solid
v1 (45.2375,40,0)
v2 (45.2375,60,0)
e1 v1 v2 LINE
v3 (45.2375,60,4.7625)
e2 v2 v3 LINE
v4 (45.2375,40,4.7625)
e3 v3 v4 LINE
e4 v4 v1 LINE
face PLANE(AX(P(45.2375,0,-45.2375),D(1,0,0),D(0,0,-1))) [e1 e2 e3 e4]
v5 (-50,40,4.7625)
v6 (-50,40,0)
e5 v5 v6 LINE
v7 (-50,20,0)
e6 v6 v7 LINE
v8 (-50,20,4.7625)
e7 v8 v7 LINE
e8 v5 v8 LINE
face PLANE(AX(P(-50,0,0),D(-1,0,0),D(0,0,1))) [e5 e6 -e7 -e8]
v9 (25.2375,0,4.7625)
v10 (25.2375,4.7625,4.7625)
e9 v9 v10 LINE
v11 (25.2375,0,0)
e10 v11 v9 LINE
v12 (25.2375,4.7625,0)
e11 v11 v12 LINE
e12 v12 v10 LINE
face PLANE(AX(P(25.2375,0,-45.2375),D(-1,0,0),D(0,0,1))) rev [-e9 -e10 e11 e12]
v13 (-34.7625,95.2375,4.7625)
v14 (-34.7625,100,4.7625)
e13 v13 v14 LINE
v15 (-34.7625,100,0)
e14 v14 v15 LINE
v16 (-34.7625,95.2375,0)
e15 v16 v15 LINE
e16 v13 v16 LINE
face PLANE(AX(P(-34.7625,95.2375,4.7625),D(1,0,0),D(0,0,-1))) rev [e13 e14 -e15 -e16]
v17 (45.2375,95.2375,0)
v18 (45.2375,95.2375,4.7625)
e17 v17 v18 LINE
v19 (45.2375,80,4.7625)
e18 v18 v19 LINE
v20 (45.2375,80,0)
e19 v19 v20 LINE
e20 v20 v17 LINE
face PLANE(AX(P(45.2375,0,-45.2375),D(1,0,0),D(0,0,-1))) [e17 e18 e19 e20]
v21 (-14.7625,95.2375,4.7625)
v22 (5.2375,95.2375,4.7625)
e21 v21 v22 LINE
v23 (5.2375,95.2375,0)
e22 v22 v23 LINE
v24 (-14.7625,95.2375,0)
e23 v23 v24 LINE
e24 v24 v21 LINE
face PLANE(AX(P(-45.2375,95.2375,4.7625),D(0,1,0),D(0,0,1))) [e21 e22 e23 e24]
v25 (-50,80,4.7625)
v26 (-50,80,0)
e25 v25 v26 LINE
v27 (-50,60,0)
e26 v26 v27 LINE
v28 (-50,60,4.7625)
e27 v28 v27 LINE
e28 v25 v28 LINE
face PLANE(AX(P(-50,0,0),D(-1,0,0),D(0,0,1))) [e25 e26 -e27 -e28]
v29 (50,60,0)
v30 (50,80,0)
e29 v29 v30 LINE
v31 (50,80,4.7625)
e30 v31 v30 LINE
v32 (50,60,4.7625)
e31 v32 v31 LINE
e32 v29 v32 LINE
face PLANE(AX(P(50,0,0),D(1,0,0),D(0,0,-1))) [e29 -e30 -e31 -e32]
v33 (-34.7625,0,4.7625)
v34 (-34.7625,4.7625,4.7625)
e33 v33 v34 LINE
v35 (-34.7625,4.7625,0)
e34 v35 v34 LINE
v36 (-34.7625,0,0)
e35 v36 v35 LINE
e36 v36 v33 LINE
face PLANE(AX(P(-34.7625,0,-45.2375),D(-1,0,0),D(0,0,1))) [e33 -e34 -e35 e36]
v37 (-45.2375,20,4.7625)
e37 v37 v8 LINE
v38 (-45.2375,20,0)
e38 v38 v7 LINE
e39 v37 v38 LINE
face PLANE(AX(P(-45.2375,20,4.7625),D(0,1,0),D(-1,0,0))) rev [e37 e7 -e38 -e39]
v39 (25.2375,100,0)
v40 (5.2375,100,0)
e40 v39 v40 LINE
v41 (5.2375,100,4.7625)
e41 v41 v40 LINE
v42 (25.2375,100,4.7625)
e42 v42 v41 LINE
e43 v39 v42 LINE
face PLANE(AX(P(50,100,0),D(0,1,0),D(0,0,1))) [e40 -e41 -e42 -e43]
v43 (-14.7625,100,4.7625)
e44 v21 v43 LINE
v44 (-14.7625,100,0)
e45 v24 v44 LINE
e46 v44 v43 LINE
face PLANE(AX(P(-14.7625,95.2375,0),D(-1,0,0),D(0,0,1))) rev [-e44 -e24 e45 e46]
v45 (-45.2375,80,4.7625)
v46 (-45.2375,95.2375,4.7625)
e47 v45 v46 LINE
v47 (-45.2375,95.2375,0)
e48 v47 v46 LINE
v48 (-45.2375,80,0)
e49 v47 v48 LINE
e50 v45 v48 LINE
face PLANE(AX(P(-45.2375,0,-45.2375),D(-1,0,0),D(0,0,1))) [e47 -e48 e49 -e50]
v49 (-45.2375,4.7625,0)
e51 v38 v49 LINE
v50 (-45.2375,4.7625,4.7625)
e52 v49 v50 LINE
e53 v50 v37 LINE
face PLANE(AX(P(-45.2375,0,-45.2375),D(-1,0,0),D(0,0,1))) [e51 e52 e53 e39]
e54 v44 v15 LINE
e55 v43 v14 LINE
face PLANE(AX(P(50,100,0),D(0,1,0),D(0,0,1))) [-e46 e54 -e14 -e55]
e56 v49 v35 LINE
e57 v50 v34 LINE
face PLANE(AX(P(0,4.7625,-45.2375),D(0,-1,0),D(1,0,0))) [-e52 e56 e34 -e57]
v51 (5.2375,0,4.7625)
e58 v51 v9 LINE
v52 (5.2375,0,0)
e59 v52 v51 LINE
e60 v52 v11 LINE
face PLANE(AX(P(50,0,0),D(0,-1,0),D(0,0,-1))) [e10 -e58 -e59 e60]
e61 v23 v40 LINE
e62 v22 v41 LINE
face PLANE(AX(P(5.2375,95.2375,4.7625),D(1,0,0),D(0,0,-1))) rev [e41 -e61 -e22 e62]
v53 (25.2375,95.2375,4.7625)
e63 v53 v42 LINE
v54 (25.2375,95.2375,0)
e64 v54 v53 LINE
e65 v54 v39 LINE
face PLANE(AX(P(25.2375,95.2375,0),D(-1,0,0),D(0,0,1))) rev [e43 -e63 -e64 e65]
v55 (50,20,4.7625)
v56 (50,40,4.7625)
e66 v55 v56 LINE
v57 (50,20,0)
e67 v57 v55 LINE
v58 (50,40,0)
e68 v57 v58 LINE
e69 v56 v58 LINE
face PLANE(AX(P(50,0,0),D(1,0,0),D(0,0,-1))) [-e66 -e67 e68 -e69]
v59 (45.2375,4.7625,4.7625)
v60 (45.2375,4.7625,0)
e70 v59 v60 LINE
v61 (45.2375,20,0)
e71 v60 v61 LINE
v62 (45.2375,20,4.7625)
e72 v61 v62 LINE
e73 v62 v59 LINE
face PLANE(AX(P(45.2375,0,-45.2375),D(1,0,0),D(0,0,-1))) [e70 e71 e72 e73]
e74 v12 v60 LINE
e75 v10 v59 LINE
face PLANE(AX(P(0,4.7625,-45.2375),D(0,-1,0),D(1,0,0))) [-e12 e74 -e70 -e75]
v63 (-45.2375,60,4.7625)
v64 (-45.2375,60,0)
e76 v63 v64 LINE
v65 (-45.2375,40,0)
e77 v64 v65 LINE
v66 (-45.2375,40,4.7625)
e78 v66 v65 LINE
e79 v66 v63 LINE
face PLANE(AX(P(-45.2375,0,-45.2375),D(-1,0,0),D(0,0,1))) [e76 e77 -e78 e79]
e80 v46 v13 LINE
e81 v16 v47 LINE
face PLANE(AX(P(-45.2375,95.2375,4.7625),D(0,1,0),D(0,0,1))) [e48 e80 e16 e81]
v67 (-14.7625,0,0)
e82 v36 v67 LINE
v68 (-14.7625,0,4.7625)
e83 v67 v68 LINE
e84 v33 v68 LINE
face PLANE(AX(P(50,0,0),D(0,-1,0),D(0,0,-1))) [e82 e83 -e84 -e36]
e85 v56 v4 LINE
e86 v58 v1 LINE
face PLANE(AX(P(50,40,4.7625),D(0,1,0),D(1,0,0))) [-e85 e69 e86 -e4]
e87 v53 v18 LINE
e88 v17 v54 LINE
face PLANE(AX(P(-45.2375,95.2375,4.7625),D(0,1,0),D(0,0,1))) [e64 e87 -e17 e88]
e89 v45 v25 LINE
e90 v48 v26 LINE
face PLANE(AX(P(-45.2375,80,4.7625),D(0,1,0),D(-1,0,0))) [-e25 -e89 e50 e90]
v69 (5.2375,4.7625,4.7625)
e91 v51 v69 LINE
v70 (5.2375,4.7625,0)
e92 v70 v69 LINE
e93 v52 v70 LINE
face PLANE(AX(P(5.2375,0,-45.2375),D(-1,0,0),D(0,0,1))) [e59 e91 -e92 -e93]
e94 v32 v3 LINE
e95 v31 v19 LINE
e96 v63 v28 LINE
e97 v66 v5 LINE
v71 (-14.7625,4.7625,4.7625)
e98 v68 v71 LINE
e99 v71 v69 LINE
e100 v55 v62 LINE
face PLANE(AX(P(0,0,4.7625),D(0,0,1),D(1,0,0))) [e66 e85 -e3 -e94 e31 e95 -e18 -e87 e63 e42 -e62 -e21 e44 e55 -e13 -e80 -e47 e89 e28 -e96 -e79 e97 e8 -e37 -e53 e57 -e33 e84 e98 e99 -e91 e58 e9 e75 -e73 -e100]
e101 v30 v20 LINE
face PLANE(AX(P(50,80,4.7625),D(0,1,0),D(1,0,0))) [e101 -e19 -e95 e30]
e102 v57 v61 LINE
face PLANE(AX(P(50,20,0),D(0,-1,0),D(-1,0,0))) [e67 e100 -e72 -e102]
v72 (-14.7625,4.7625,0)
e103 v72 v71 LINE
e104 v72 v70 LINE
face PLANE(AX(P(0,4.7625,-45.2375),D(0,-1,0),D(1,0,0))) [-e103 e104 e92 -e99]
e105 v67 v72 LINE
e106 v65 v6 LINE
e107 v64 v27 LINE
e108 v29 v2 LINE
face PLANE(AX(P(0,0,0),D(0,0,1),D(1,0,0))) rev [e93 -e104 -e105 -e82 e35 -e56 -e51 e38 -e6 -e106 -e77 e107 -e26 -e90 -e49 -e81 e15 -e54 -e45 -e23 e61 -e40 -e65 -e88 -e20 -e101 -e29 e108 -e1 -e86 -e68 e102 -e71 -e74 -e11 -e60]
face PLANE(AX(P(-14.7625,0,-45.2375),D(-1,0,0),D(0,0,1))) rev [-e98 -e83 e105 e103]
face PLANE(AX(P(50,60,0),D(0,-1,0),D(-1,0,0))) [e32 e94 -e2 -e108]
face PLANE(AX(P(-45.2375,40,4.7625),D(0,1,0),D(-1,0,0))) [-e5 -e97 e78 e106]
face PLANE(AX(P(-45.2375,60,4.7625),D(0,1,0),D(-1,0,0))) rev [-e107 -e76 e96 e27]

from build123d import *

# Parameters (mm, degrees)
SKETCH2_W           = 100
SKETCH2_H           = 100
BOSS_EXTRUDE1_DEPTH = 4.7625
CAVITY1_START       = -50
CAVITY1_OUTLINE_W   = 20
CAVITY1_OUTLINE_H   = 4.7625
CAVITY1_DEPTH       = 4.7625
CAVITY1_START_2     = 45.2375
CAVITY1_2_OUTLINE_W = 20
CAVITY1_2_OUTLINE_H = 4.7625
CAVITY1_2_DEPTH     = 4.7625
CAVITY1_START_3     = -14.7625
CAVITY1_3_OUTLINE_W = 4.7625
CAVITY1_3_OUTLINE_H = 4.7625
CAVITY1_3_DEPTH     = 20
CAVITY1_START_4     = 25.2375
CAVITY1_4_OUTLINE_W = 4.7625
CAVITY1_4_OUTLINE_H = 4.7625
CAVITY1_4_DEPTH     = 20
CAVITY1_START_5     = -45.2375
CAVITY1_5_OUTLINE_W = 4.7625
CAVITY1_5_OUTLINE_H = 4.7625
CAVITY1_5_DEPTH     = 10.475


# Read off the part's stored shape, not the designer's step: Cavity1
with BuildPart() as part:
    # Sketch2 → Boss-Extrude1 (new body)
    with BuildSketch(Plane.XY.offset(4.7625)):
        with Locations((0, 50)):
            Rectangle(SKETCH2_W, SKETCH2_H)
    extrude(amount=-BOSS_EXTRUDE1_DEPTH)

    # Cavity1 outline → Cavity1 (cut)
    with BuildSketch(Plane.YZ.offset(CAVITY1_START)):
        with Locations((10, 2.38125)):
            Rectangle(CAVITY1_OUTLINE_W, CAVITY1_OUTLINE_H)
        with Locations((50, 2.38125)):
            Rectangle(CAVITY1_OUTLINE_W, CAVITY1_OUTLINE_H)
        with Locations((90, 2.38125)):
            Rectangle(CAVITY1_OUTLINE_W, CAVITY1_OUTLINE_H)
    extrude(amount=CAVITY1_DEPTH, mode=Mode.SUBTRACT)

    # Cavity1 2 outline → Cavity1 2 (cut)
    with BuildSketch(Plane.YZ.offset(CAVITY1_START_2)):
        with Locations((10, 2.38125)):
            Rectangle(CAVITY1_2_OUTLINE_W, CAVITY1_2_OUTLINE_H)
        with Locations((50, 2.38125)):
            Rectangle(CAVITY1_2_OUTLINE_W, CAVITY1_2_OUTLINE_H)
        with Locations((90, 2.38125)):
            Rectangle(CAVITY1_2_OUTLINE_W, CAVITY1_2_OUTLINE_H)
    extrude(amount=CAVITY1_2_DEPTH, mode=Mode.SUBTRACT)

    # Cavity1 3 outline → Cavity1 3 (cut)
    with BuildSketch(Plane.YZ.offset(CAVITY1_START_3)):
        with Locations((2.38125, 2.38125)):
            Rectangle(CAVITY1_3_OUTLINE_W, CAVITY1_3_OUTLINE_H)
        with Locations((97.61875, 2.38125)):
            Rectangle(CAVITY1_3_OUTLINE_W, CAVITY1_3_OUTLINE_H)
    extrude(amount=CAVITY1_3_DEPTH, mode=Mode.SUBTRACT)

    # Cavity1 4 outline → Cavity1 4 (cut)
    with BuildSketch(Plane.YZ.offset(CAVITY1_START_4)):
        with Locations((2.38125, 2.38125)):
            Rectangle(CAVITY1_4_OUTLINE_W, CAVITY1_4_OUTLINE_H)
        with Locations((97.61875, 2.38125)):
            Rectangle(CAVITY1_4_OUTLINE_W, CAVITY1_4_OUTLINE_H)
    extrude(amount=CAVITY1_4_DEPTH, mode=Mode.SUBTRACT)

    # Cavity1 5 outline → Cavity1 5 (cut)
    with BuildSketch(Plane.YZ.offset(CAVITY1_START_5)):
        with Locations((2.38125, 2.38125)):
            Rectangle(CAVITY1_5_OUTLINE_W, CAVITY1_5_OUTLINE_H)
        with Locations((97.61875, 2.38125)):
            Rectangle(CAVITY1_5_OUTLINE_W, CAVITY1_5_OUTLINE_H)
    extrude(amount=CAVITY1_5_DEPTH, mode=Mode.SUBTRACT)


solid = part.part
